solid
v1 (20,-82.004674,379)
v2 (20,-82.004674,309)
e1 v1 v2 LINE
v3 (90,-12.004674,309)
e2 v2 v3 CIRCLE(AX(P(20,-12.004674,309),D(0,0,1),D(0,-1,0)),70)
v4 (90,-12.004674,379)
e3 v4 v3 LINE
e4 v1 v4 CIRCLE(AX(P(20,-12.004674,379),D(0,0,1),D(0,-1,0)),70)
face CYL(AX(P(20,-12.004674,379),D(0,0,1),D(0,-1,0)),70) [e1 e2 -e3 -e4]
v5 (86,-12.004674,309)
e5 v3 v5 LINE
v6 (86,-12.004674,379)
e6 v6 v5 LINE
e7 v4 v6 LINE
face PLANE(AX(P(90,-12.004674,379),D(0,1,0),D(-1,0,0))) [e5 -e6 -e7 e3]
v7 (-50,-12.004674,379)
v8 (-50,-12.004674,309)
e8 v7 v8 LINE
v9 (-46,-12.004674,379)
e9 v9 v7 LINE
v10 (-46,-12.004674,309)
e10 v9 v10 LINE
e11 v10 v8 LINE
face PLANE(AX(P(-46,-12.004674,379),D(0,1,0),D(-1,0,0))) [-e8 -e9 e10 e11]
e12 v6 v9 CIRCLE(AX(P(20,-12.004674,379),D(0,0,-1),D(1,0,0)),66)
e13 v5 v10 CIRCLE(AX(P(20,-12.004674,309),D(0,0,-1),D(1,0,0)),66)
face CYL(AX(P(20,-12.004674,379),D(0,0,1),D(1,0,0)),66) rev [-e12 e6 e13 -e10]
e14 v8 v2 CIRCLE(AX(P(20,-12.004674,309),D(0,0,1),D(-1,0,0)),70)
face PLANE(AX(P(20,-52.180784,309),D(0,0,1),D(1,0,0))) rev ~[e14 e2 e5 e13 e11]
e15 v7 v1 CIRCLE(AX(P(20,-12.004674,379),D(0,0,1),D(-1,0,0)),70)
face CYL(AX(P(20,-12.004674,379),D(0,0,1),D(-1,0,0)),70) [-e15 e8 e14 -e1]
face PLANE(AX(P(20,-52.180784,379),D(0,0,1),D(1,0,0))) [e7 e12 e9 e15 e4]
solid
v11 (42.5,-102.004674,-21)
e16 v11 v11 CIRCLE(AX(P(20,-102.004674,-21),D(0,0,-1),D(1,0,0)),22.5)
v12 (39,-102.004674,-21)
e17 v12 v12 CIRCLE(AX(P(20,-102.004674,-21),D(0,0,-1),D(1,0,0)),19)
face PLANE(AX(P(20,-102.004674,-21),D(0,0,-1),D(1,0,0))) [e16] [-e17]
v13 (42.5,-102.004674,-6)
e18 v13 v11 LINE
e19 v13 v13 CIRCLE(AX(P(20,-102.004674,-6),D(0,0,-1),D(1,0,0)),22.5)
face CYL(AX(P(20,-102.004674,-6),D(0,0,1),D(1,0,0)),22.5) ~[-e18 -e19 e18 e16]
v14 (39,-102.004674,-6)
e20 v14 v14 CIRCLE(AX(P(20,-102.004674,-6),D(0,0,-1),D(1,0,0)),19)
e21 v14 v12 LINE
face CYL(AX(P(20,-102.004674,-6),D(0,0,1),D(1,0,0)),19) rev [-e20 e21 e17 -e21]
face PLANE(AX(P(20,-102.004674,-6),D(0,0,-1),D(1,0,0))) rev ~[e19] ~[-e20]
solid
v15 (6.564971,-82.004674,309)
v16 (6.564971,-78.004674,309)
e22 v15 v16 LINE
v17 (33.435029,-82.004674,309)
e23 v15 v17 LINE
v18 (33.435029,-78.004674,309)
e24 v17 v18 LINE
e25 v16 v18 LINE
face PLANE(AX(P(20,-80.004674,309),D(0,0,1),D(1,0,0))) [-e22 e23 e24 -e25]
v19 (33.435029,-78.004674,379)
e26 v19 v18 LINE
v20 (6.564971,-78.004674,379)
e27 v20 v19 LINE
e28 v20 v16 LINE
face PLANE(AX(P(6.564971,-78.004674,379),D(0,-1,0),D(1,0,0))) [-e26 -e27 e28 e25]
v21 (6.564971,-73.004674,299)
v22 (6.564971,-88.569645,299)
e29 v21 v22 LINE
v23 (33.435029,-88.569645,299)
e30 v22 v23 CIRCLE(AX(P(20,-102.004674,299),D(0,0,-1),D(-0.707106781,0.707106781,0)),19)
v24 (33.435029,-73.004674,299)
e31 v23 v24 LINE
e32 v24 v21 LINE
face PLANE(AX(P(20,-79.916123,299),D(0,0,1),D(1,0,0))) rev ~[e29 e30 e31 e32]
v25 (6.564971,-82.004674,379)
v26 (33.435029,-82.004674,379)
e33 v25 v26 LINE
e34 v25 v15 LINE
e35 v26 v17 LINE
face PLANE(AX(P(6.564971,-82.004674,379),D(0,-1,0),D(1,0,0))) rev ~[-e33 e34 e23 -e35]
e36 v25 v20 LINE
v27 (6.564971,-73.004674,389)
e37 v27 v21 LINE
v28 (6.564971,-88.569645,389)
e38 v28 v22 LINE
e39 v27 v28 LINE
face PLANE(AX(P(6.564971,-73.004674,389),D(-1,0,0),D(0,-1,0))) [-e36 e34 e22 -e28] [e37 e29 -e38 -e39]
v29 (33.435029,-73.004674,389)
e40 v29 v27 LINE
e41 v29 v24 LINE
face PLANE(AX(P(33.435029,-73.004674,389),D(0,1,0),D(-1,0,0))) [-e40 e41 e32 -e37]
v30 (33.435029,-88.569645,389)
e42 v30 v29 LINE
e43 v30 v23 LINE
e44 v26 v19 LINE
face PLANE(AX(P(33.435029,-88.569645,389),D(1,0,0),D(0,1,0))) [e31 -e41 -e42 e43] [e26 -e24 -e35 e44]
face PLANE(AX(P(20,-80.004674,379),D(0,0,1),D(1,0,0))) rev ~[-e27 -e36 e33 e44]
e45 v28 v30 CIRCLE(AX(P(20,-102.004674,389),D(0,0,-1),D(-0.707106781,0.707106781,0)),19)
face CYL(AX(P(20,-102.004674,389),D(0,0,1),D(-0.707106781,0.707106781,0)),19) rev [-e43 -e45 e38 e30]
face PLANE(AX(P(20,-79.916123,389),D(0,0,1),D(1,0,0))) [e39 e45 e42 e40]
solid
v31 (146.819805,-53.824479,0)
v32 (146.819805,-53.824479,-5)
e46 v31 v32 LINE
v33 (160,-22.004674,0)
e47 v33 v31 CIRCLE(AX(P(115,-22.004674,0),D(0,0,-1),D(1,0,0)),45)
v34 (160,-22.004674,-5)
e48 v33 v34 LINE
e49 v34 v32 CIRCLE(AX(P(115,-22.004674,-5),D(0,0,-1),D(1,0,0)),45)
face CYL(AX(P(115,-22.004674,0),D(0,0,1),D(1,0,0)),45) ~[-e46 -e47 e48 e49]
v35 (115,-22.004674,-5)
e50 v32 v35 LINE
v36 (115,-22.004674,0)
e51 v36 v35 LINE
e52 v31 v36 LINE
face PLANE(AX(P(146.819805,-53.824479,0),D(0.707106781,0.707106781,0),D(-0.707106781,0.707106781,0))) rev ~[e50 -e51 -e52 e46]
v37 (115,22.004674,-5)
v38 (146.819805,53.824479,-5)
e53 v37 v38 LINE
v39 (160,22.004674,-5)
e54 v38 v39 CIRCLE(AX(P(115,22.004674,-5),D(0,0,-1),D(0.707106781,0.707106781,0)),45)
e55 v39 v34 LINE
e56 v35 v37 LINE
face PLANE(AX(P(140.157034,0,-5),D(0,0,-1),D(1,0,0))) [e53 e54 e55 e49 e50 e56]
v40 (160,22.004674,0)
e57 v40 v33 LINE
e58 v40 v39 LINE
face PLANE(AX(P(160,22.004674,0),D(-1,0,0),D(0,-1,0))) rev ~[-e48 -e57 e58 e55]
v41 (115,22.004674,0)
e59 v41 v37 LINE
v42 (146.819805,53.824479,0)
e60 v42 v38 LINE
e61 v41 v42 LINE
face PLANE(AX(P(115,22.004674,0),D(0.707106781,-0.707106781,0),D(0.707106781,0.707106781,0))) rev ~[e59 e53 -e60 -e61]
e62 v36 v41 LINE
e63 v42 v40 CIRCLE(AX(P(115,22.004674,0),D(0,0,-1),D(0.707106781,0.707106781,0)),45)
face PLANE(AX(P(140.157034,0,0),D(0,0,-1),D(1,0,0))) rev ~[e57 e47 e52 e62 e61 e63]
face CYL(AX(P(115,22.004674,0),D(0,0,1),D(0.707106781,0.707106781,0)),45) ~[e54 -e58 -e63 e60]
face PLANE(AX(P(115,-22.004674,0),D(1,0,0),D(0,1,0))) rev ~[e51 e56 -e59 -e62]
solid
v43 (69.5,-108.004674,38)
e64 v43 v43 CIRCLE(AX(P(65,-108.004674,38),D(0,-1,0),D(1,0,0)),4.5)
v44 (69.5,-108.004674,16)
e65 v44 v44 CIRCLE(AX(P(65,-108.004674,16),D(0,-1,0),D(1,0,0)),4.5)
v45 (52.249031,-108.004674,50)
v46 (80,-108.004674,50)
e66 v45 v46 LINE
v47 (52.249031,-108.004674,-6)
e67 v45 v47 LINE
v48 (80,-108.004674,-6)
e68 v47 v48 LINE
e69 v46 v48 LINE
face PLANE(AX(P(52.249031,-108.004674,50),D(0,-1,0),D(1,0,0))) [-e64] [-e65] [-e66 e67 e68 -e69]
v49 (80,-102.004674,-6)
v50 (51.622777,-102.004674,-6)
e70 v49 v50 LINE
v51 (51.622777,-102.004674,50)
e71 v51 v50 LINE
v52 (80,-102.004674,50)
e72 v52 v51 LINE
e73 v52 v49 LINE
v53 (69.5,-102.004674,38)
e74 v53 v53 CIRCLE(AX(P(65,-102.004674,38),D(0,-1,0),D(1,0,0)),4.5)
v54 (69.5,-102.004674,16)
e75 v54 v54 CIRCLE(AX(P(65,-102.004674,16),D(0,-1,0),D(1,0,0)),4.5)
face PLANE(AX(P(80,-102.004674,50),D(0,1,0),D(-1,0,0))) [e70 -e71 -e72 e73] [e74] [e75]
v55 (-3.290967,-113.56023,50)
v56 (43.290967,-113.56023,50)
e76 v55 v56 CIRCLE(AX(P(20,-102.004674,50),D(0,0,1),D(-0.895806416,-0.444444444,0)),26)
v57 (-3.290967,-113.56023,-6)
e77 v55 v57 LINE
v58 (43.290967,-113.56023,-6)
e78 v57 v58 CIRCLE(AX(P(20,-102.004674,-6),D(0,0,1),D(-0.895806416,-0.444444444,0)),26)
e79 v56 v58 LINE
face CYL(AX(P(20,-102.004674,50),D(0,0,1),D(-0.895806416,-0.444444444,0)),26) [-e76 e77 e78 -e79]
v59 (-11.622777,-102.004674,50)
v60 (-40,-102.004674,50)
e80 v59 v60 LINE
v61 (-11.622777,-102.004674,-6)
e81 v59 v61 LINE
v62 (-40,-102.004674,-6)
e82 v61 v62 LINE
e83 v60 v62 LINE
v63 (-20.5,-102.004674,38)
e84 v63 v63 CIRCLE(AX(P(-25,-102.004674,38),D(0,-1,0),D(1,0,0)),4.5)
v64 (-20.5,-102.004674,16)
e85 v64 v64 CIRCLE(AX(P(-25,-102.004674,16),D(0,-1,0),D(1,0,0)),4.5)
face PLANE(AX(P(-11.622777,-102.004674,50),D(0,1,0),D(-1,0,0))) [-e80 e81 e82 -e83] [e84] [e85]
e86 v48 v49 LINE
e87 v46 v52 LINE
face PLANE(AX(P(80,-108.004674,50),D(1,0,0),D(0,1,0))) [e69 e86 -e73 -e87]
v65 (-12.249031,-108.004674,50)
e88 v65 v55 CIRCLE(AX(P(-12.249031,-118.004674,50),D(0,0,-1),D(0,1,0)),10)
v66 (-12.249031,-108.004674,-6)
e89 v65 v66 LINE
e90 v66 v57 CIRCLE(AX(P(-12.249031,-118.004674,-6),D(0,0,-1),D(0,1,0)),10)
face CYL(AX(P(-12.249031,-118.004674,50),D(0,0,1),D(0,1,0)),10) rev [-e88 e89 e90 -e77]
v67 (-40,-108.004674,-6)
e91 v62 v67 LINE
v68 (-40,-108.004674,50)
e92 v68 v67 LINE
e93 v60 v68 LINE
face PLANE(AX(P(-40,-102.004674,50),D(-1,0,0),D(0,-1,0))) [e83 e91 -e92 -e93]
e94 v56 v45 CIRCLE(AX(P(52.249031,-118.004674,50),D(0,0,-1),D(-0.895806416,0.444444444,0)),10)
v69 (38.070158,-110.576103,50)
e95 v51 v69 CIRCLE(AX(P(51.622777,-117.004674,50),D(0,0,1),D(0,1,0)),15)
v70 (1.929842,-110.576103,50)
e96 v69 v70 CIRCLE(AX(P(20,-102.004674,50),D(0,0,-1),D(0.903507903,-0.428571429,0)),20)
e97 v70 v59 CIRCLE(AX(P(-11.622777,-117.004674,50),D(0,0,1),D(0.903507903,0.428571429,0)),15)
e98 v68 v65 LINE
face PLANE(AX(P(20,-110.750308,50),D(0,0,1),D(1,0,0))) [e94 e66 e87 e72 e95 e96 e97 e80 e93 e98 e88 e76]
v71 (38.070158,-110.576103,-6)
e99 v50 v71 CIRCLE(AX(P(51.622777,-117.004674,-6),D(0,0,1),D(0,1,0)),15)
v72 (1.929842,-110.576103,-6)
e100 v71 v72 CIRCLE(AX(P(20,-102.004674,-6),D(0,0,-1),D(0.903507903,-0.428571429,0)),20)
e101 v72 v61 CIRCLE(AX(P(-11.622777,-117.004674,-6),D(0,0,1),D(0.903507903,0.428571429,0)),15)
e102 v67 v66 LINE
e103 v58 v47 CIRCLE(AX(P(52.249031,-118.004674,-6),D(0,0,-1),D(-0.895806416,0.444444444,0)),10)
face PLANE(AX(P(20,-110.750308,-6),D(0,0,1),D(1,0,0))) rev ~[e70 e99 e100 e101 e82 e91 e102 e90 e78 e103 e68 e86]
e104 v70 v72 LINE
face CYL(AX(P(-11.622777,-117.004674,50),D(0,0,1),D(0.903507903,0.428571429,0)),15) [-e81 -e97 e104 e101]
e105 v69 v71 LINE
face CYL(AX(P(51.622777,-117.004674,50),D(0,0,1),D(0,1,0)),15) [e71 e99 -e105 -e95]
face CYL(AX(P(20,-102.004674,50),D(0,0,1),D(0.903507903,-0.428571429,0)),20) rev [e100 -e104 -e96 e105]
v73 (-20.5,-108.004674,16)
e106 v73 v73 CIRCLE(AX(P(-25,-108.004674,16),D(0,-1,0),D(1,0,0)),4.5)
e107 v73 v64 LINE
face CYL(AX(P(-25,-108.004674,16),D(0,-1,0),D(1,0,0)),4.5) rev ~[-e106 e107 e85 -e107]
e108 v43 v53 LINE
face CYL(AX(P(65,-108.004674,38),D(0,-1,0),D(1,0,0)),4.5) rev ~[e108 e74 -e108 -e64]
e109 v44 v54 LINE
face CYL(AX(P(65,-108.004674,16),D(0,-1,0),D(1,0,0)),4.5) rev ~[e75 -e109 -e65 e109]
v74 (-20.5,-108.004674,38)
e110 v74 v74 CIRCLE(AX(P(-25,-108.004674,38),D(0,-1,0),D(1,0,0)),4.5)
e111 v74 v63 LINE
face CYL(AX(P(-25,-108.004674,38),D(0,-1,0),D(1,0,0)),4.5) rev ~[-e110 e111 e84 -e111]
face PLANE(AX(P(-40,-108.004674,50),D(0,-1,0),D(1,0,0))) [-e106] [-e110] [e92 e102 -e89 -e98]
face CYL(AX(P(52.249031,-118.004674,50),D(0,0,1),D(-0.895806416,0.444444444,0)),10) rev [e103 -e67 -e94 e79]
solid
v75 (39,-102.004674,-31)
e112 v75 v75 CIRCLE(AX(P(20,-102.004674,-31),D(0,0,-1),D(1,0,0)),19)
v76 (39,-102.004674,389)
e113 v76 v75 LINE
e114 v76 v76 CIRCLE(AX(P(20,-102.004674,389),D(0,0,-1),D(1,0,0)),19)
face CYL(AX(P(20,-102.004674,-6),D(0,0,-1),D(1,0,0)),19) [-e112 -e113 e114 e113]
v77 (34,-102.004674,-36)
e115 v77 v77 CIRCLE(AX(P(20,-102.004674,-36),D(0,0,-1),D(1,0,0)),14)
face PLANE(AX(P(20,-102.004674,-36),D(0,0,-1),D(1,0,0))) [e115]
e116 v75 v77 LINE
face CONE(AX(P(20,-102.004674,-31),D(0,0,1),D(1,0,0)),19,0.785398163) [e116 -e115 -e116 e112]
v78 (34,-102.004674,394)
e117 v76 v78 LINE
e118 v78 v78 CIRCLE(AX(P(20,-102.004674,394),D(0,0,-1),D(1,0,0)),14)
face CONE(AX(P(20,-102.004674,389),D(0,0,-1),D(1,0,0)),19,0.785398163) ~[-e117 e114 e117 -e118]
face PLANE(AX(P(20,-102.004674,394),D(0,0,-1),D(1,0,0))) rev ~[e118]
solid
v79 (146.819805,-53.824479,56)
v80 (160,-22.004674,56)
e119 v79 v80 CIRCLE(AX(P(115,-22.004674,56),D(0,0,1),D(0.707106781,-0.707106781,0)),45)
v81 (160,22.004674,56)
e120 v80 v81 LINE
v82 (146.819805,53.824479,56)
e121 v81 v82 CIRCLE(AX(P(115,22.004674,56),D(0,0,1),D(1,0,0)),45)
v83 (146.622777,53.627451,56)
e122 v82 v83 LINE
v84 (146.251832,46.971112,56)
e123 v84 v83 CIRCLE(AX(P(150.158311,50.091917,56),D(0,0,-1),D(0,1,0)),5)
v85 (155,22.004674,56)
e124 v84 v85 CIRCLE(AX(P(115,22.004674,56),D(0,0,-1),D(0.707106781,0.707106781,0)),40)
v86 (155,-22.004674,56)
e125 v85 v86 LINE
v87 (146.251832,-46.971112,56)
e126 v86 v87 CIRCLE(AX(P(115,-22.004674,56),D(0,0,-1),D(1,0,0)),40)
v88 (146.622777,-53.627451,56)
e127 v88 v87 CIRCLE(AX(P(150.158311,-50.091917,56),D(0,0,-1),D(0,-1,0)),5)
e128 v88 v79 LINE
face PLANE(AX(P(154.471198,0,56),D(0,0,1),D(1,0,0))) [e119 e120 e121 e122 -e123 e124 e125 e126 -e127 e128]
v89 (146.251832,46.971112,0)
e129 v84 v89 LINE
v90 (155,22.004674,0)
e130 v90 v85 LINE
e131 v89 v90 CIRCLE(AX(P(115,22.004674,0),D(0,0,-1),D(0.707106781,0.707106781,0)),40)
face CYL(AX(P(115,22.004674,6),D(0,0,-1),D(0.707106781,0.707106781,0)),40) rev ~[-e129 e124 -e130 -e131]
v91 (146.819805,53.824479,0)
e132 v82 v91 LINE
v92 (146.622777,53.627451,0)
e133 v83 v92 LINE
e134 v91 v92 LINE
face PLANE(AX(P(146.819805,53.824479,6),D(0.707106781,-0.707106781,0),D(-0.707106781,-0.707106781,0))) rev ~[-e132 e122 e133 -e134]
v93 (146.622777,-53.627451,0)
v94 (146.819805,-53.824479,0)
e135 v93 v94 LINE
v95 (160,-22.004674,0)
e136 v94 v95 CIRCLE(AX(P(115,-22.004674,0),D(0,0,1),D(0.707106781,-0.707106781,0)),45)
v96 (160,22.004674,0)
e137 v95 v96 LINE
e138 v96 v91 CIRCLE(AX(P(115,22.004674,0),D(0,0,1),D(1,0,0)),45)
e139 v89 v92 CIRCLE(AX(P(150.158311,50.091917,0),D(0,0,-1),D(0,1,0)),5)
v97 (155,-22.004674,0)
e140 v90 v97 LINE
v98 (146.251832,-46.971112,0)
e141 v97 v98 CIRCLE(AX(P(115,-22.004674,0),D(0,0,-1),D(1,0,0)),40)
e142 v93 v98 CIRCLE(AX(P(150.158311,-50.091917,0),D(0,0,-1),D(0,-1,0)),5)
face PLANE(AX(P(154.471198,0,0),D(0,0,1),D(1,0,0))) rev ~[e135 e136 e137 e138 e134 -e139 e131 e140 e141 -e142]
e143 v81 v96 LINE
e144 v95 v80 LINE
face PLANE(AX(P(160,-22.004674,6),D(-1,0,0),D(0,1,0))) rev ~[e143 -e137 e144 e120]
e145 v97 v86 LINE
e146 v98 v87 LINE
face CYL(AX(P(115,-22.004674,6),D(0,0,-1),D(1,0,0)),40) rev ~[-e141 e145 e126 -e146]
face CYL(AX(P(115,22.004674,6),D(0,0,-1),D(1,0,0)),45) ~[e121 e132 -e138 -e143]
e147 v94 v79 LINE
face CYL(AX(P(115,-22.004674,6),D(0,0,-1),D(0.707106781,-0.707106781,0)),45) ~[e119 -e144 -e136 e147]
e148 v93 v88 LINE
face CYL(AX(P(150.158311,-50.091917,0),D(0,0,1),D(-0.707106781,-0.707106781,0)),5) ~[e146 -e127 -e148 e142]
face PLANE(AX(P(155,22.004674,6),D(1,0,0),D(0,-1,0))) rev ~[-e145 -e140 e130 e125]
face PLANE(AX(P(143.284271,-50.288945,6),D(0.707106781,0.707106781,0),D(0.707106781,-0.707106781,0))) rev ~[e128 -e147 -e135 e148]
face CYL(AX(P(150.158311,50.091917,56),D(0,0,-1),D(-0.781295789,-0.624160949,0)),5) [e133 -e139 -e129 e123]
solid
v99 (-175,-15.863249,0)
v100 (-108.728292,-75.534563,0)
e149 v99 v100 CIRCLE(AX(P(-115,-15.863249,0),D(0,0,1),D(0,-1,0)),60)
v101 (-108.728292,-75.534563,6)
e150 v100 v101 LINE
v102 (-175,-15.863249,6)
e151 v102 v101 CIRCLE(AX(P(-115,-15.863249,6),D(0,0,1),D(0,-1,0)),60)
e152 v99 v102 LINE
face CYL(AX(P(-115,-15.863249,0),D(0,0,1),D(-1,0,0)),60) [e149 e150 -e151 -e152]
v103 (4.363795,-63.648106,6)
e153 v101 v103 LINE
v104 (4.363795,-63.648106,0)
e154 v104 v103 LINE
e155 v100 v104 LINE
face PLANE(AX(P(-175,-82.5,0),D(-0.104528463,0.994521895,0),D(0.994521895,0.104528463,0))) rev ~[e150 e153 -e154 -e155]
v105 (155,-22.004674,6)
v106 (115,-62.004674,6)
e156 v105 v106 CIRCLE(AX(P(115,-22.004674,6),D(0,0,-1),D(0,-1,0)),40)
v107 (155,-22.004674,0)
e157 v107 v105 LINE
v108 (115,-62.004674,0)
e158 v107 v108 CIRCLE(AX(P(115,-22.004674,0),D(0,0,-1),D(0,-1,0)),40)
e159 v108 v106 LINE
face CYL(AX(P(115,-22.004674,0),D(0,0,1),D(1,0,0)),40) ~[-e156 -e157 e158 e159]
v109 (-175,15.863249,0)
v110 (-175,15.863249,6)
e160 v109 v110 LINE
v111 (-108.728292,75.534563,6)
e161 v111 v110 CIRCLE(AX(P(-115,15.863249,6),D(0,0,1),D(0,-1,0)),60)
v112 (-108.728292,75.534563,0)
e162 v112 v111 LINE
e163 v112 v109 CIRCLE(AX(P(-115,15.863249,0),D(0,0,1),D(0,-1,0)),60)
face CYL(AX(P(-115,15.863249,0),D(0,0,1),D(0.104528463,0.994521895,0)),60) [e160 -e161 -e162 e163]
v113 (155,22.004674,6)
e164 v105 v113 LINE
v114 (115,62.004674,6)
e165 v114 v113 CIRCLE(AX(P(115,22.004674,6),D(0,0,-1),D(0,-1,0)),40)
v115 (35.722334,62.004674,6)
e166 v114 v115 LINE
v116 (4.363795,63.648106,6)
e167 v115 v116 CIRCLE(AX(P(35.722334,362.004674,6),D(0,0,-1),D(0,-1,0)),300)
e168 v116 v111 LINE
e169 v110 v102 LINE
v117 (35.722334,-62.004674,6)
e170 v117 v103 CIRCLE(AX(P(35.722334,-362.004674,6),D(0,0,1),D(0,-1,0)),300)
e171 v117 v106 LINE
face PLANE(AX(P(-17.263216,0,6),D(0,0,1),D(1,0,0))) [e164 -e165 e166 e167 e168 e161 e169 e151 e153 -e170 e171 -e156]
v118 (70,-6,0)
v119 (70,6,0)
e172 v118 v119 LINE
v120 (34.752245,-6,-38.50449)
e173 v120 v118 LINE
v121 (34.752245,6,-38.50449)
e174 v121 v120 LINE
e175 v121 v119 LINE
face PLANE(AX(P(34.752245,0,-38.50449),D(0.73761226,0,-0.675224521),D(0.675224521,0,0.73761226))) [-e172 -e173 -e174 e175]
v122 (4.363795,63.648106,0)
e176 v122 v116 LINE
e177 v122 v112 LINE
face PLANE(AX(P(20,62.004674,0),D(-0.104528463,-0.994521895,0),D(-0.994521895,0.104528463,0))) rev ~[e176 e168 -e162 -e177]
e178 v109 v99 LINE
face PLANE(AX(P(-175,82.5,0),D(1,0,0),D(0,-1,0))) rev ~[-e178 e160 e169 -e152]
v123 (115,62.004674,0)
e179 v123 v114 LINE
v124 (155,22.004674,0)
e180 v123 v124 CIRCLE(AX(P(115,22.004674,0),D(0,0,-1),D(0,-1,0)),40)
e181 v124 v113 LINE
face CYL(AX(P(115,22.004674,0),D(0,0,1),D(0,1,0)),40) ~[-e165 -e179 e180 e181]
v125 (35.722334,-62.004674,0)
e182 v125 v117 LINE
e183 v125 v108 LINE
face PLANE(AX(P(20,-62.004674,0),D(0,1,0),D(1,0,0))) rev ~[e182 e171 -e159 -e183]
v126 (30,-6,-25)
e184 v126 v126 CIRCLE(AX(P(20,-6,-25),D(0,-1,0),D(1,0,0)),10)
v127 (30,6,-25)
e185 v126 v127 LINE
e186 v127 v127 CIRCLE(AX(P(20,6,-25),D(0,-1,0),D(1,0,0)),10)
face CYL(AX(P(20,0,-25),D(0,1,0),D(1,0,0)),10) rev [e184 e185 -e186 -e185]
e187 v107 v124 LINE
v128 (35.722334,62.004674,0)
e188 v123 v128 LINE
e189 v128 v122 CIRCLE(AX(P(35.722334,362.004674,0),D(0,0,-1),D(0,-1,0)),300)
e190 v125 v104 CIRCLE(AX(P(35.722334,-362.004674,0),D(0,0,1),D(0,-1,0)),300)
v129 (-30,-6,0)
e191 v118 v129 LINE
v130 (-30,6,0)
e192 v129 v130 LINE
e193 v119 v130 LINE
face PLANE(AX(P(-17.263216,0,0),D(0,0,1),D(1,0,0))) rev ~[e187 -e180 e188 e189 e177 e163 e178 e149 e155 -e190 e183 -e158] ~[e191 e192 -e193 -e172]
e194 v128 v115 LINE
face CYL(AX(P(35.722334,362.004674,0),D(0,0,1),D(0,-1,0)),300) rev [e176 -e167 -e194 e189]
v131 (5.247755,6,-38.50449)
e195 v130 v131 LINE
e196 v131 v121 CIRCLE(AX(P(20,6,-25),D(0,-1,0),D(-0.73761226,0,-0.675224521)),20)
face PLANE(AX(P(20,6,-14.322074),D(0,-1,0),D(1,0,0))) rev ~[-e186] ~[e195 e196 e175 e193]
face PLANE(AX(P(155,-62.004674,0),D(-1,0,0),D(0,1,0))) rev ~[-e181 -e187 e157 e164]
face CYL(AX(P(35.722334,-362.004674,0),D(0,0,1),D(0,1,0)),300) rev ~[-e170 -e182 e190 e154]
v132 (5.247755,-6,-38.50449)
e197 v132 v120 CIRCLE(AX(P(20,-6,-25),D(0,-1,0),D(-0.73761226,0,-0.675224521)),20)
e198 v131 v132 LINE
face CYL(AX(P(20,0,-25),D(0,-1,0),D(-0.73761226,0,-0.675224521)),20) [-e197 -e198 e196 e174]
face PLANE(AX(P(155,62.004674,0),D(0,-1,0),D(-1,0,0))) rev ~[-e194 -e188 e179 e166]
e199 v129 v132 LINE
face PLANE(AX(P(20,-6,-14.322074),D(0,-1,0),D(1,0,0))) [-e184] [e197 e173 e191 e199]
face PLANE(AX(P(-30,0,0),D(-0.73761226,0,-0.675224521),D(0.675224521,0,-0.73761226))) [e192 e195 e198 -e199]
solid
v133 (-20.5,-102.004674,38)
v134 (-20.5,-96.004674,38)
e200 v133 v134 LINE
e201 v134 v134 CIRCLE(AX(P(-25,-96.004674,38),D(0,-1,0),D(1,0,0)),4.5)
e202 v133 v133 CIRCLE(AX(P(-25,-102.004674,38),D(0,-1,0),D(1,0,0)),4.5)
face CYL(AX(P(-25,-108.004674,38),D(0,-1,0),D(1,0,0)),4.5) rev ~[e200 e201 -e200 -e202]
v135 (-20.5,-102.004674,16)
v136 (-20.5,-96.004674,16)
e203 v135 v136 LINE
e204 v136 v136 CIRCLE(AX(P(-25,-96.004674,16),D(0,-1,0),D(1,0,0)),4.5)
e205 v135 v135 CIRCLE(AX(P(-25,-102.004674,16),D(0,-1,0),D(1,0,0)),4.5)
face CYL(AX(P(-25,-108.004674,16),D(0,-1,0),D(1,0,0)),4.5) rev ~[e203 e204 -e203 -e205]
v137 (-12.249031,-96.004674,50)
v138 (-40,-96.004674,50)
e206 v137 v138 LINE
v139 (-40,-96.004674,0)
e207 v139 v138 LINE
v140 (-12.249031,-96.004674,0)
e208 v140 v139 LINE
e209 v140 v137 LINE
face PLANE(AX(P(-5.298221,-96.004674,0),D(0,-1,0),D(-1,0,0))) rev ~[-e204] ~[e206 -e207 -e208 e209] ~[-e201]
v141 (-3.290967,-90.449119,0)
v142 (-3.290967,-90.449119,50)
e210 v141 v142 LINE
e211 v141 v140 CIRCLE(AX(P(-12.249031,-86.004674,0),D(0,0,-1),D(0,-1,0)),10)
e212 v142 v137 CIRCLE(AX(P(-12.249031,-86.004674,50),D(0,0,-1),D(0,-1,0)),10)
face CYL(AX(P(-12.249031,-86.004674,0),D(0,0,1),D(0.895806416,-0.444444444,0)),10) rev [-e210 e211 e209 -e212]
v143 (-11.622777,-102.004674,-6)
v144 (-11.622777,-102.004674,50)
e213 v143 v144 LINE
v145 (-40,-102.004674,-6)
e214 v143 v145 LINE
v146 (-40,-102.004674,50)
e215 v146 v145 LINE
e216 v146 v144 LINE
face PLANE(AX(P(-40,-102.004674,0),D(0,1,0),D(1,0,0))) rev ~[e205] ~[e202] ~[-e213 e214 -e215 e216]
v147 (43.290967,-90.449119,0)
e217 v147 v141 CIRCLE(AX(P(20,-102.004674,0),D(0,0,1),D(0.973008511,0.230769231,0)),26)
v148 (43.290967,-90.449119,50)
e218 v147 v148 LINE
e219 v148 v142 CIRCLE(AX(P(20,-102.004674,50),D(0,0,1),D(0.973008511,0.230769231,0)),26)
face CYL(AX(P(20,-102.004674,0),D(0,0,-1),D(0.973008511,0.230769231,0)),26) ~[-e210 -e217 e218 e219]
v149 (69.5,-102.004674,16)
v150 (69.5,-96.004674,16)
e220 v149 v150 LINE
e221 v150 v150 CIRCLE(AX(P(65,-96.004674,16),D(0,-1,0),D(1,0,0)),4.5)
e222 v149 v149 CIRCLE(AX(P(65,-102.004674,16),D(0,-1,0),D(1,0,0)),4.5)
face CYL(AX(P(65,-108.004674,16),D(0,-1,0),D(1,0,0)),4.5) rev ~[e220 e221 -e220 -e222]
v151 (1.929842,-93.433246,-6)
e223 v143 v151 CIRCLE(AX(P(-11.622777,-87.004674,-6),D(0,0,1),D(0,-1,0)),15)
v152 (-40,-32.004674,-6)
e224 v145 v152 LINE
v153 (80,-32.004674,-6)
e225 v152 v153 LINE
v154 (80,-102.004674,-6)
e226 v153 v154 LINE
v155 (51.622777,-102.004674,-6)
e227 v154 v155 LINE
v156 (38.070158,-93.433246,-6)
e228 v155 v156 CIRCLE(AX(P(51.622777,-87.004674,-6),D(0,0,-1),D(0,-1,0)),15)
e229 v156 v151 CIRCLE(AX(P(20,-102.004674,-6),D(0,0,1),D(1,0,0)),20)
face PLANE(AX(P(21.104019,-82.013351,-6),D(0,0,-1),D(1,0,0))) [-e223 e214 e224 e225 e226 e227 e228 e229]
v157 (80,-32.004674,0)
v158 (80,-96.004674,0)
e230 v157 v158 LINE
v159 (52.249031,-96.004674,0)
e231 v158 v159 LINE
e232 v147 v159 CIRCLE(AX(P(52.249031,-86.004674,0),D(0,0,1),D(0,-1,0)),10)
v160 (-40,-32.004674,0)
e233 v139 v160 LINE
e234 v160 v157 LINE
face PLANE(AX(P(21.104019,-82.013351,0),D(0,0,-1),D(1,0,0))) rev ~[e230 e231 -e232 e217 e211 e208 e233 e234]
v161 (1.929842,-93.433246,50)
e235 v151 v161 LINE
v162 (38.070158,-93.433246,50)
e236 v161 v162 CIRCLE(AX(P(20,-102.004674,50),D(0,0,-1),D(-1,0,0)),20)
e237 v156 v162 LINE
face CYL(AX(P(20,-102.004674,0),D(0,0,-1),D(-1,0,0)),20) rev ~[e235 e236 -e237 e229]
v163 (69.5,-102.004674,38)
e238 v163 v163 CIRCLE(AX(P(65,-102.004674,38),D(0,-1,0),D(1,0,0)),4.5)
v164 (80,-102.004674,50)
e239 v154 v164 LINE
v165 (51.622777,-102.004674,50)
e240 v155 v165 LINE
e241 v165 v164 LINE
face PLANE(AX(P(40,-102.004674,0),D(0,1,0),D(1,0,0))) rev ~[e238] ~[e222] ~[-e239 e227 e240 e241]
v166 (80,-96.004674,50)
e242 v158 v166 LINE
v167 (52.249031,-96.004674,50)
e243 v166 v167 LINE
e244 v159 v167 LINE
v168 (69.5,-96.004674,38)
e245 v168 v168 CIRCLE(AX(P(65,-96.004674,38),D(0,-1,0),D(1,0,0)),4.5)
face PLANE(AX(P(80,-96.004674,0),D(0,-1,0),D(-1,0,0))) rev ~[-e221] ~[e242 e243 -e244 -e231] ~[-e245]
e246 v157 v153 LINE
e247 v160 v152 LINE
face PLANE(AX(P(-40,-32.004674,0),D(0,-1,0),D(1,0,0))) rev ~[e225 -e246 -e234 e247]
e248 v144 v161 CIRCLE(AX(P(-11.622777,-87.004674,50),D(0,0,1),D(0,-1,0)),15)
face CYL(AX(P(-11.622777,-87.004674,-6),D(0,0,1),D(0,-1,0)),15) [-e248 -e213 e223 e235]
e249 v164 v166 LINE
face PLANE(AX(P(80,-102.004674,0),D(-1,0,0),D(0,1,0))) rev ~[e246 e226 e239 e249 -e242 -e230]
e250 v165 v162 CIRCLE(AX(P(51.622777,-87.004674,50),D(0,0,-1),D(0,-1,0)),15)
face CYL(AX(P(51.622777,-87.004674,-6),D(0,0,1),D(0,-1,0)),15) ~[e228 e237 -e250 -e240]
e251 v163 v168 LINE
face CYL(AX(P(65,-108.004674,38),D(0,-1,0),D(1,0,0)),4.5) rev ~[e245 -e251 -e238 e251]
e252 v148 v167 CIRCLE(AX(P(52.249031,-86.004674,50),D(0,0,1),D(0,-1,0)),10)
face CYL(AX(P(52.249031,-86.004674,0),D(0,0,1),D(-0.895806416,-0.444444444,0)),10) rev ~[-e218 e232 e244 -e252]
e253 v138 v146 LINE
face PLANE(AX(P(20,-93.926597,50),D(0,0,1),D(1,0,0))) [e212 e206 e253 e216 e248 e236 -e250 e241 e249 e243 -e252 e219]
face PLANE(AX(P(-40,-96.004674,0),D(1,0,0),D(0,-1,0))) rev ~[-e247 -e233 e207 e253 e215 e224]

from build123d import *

# Parameters (mm, degrees)
F1_DEPTH  = 6
F2_R      = 60
F3_R      = 40
F4_R      = 300
F5_R      = 10
F6_DEPTH  = 6
F8_DEPTH  = 6
F9_DEPTH  = 50
F10_R     = 5
F12_DEPTH = 5
F14_DEPTH = 6
F16_DEPTH = 50
F17_R     = 10
F18_R     = 15
F20_DEPTH = 56
F21_R     = 4.5
F22_DEPTH = 25
F23_R     = 4.5
F24_DEPTH = 25
F25_R     = 19
F26_DEPTH = 400
F27_DEPTH = 30
F28_SIZE  = 5
F29_R     = 22.5
F29_R_2   = 19
F30_DEPTH = 15
F31_SIZE  = 5
F34_DEPTH = 90
F36_W     = 26.8700576851
F36_H     = 4
F37_DEPTH = 70
F39_DEPTH = 70


with BuildPart() as f1:
    # F0 (on Top) → F1 (new body)
    with BuildSketch(Plane.XY):
        Polygon((20, 62.0046741232), (-175, 82.5), (-175, -82.5), (20, -62.0046741232), (155, -62.0046741232), (155, 62.0046741232), align=None)
    extrude(amount=F1_DEPTH)

    # F2
    f2_edges = [f1.edges().sort_by_distance(p)[0] for p in [
        (-175, -82.5, 3),
        (-175, 82.5, 3),
    ]]
    fillet(f2_edges, radius=F2_R)

    # F3
    f3_edges = [f1.edges().sort_by_distance(p)[0] for p in [
        (155, 62.004674, 3),
        (155, -62.004674, 3),
    ]]
    fillet(f3_edges, radius=F3_R)

    # F4
    f4_edges = [f1.edges().sort_by_distance(p)[0] for p in [
        (20, -62.004674, 3),
        (20, 62.004674, 3),
    ]]
    fillet(f4_edges, radius=F4_R)

    # F5 (on Front) → F6 (join, symmetric)
    with BuildSketch(Plane.XZ):
        with BuildLine():
            Line((-30, 0), (5.2477547929, -38.5044904143))
            ThreePointArc((5.2477547929, -38.5044904143), (20, -45), (34.7522452071, -38.5044904143))
            Line((34.7522452071, -38.5044904143), (70, 0))
            Line((70, 0), (-30, 0))
        make_face()
        with Locations((20, -25)):
            Circle(F5_R, mode=Mode.SUBTRACT)
    extrude(amount=F6_DEPTH, both=True)

    # F23 (on face) → F24 (cut)
    with BuildSketch(Plane(origin=(0, -96.0046741232, 0), x_dir=(-1, 0, 0), z_dir=(0, 1, 0))):
        with Locations((25, 38)):
            Circle(F23_R)
        with Locations((25, 16)):
            Circle(F23_R)
        with Locations((-65, 38)):
            Circle(F23_R)
        with Locations((-65, 16)):
            Circle(F23_R)
    extrude(amount=-F24_DEPTH, mode=Mode.SUBTRACT)


with BuildPart() as f8:
    # F7 (on face) → F8 (new body)
    with BuildSketch(Plane.XY.offset(6)):
        with BuildLine():
            ThreePointArc((143.2842712475, 50.2889453707), (151.9551813005, 37.3120114178), (155, 22.0046741232))
            Line((155, 22.0046741232), (155, -22.0046741232))
            ThreePointArc((155, -22.0046741232), (151.9551813005, -37.3120114178), (143.2842712475, -50.2889453707))
            Line((143.2842712475, -50.2889453707), (146.8198051534, -53.8244792766))
            ThreePointArc((146.8198051534, -53.8244792766), (156.574578963, -39.2254285796), (160, -22.0046741232))
            Line((160, -22.0046741232), (160, 22.0046741232))
            ThreePointArc((160, 22.0046741232), (156.574578963, 39.2254285796), (146.8198051534, 53.8244792766))
            Line((146.8198051534, 53.8244792766), (143.2842712475, 50.2889453707))
        make_face()
    extrude(amount=-F8_DEPTH)

    # F7 (on face) → F9 (join)
    with BuildSketch(Plane.XY.offset(6)):
        with BuildLine():
            ThreePointArc((143.2842712475, 50.2889453707), (151.9551813005, 37.3120114178), (155, 22.0046741232))
            Line((155, 22.0046741232), (155, -22.0046741232))
            ThreePointArc((155, -22.0046741232), (151.9551813005, -37.3120114178), (143.2842712475, -50.2889453707))
            Line((143.2842712475, -50.2889453707), (146.8198051534, -53.8244792766))
            ThreePointArc((146.8198051534, -53.8244792766), (156.574578963, -39.2254285796), (160, -22.0046741232))
            Line((160, -22.0046741232), (160, 22.0046741232))
            ThreePointArc((160, 22.0046741232), (156.574578963, 39.2254285796), (146.8198051534, 53.8244792766))
            Line((146.8198051534, 53.8244792766), (143.2842712475, 50.2889453707))
        make_face()
    extrude(amount=F9_DEPTH)

    # F10
    f10_edges = [f8.edges().sort_by_distance(p)[0] for p in [
        (143.284271, -50.288945, 28),
        (143.284271, 50.288945, 28),
    ]]
    fillet(f10_edges, radius=F10_R)


with BuildPart() as f12:
    # F11 (on face) → F12 (new body)
    with BuildSketch(Plane(origin=(0, 0, 0), x_dir=(1, 0, 0), z_dir=(0, 0, -1))):
        with BuildLine():
            ThreePointArc((160, 22.0046741232), (156.574578963, 39.2254285796), (146.8198051534, 53.8244792766))
            Line((146.8198051534, 53.8244792766), (115, 22.0046741232))
            Line((115, 22.0046741232), (115, -22.0046741232))
            Line((115, -22.0046741232), (146.8198051534, -53.8244792766))
            ThreePointArc((146.8198051534, -53.8244792766), (156.574578963, -39.2254285796), (160, -22.0046741232))
            Line((160, -22.0046741232), (160, 22.0046741232))
        make_face()
    extrude(amount=F12_DEPTH)


with BuildPart() as f14:
    # F13 (on face) → F14 (new body)
    with BuildSketch(Plane(origin=(0, 0, 0), x_dir=(1, 0, 0), z_dir=(0, 0, -1))):
        with BuildLine():
            Line((0, 102.0046741232), (-40, 102.0046741232))
            Line((-40, 102.0046741232), (-40, 68.3109282391))
            Line((-40, 68.3109282391), (4.3637948046, 63.6481055127))
            ThreePointArc((4.3637948046, 63.6481055127), (20.021546912, 62.4158136968), (35.7223337849, 62.0046741232))
            Line((35.7223337849, 62.0046741232), (80, 62.0046741232))
            Line((80, 62.0046741232), (80, 102.0046741232))
            Line((80, 102.0046741232), (40, 102.0046741232))
            ThreePointArc((40, 102.0046741232), (20, 82.0046741232), (0, 102.0046741232))
        make_face()
        with BuildLine():
            Line((4.3637948046, 63.6481055127), (-40, 68.3109282391))
            Line((-40, 68.3109282391), (-40, 32.0046741232))
            Line((-40, 32.0046741232), (80, 32.0046741232))
            Line((80, 32.0046741232), (80, 62.0046741232))
            Line((80, 62.0046741232), (35.7223337849, 62.0046741232))
            ThreePointArc((35.7223337849, 62.0046741232), (20.021546912, 62.4158136968), (4.3637948046, 63.6481055127))
        make_face()
    extrude(amount=F14_DEPTH)

    # F15 (on face) → F16 (join)
    with BuildSketch(Plane.XY):
        with BuildLine():
            Line((-40, -102.0046741232), (0, -102.0046741232))
            ThreePointArc((0, -102.0046741232), (20, -82.0046741232), (40, -102.0046741232))
            Line((40, -102.0046741232), (80, -102.0046741232))
            Line((80, -102.0046741232), (80, -96.0046741232))
            Line((80, -96.0046741232), (45.2982212813, -96.0046741232))
            ThreePointArc((45.2982212813, -96.0046741232), (20, -76.0046741232), (-5.2982212813, -96.0046741232))
            Line((-5.2982212813, -96.0046741232), (-40, -96.0046741232))
            Line((-40, -96.0046741232), (-40, -102.0046741232))
        make_face()
    extrude(amount=F16_DEPTH)

    # F17
    f17_edges = [f14.edges().sort_by_distance(p)[0] for p in [
        (-5.298221, -96.004674, 25),
        (45.298221, -96.004674, 25),
    ]]
    fillet(f17_edges, radius=F17_R)

    # F18
    f18_edges = [f14.edges().sort_by_distance(p)[0] for p in [
        (40, -102.004674, 22),
        (0, -102.004674, 22),
    ]]
    fillet(f18_edges, radius=F18_R)


with BuildPart() as f20:
    # F19 (on face) → F20 (new body)
    with BuildSketch(Plane.XY.offset(50)):
        with BuildLine():
            Line((-11.6227766017, -102.0046741232), (-40, -102.0046741232))
            Line((-40, -102.0046741232), (-40, -108.0046741232))
            Line((-40, -108.0046741232), (-12.2490309932, -108.0046741232))
            ThreePointArc((-12.2490309932, -108.0046741232), (-6.9785682262, -109.5063082672), (-3.2909668284, -113.5602296787))
            ThreePointArc((-3.2909668284, -113.5602296787), (20, -128.0046741232), (43.2909668284, -113.5602296787))
            ThreePointArc((43.2909668284, -113.5602296787), (46.9785682262, -109.5063082672), (52.2490309932, -108.0046741232))
            Line((52.2490309932, -108.0046741232), (80, -108.0046741232))
            Line((80, -108.0046741232), (80, -102.0046741232))
            Line((80, -102.0046741232), (51.6227766017, -102.0046741232))
            ThreePointArc((51.6227766017, -102.0046741232), (43.6049393443, -104.3273603023), (38.0701580581, -110.5761026946))
            ThreePointArc((38.0701580581, -110.5761026946), (20, -122.0046741232), (1.9298419419, -110.5761026946))
            ThreePointArc((1.9298419419, -110.5761026946), (-3.6049393443, -104.3273603023), (-11.6227766017, -102.0046741232))
        make_face()
    extrude(amount=-F20_DEPTH)


with BuildPart() as f22_tool:
    # F21 (on face) → F22 (new body)
    with BuildSketch(Plane.XZ.offset(108.0046741232)):
        with Locations((-25, 38)):
            Circle(F21_R)
        with Locations((-25, 16)):
            Circle(F21_R)
        with Locations((65, 38)):
            Circle(F21_R)
        with Locations((65, 16)):
            Circle(F21_R)
    extrude(amount=-F22_DEPTH)


with BuildPart() as f14_1:
    add(f14.part)

    # F22: cut by f22_tool
    add(f22_tool.part, mode=Mode.SUBTRACT)


with BuildPart() as f20_1:
    add(f20.part)

    # F22: cut by f22_tool
    add(f22_tool.part, mode=Mode.SUBTRACT)


with BuildPart() as f26:
    # F25 (on face) → F26 (new body)
    with BuildSketch(Plane(origin=(0, 0, -6), x_dir=(1, 0, 0), z_dir=(0, 0, -1))):
        with Locations((20, 102.0046741232)):
            Circle(F25_R)
    extrude(amount=-F26_DEPTH)

    # F27 (add): a face of the model
    f27_faces = [f26.faces().sort_by_distance(p)[0] for p in [
        (20, -102.0046741232, -6),
    ]]
    extrude(f27_faces, amount=F27_DEPTH)

    # F28
    f28_edges = [f26.edges().sort_by_distance(p)[0] for p in [
        (1, -102.004674, -36),
    ]]
    chamfer(f28_edges, length=F28_SIZE)

    # F31
    f31_edges = [f26.edges().sort_by_distance(p)[0] for p in [
        (1, -102.004674, 394),
    ]]
    chamfer(f31_edges, length=F31_SIZE)


with BuildPart() as f30:
    # F29 (on face) → F30 (new body)
    with BuildSketch(Plane(origin=(0, 0, -6), x_dir=(1, 0, 0), z_dir=(0, 0, -1))):
        with Locations((20, 102.0046741232)):
            Circle(F29_R)
        with Locations((20, 102.0046741232)):
            Circle(F29_R_2, mode=Mode.SUBTRACT)
    extrude(amount=F30_DEPTH)


with BuildPart() as f34:
    # F33 (on offset) → F34 (new body)
    with BuildSketch(Plane.XY.offset(389)):
        with BuildLine():
            Line((33.4350288425, -88.5696452806), (33.4350288425, -73.0046741232))
            Line((33.4350288425, -73.0046741232), (6.5649711575, -73.0046741232))
            Line((6.5649711575, -73.0046741232), (6.5649711575, -88.5696452806))
            ThreePointArc((6.5649711575, -88.5696452806), (20, -83.0046741232), (33.4350288425, -88.5696452806))
        make_face()
    extrude(amount=-F34_DEPTH)

    # F36 (on offset) → F37 (cut)
    with BuildSketch(Plane.XY.offset(379)):
        with Locations((20, -80.0046741232)):
            Rectangle(F36_W, F36_H)
    extrude(amount=-F37_DEPTH, mode=Mode.SUBTRACT)


with BuildPart() as f39:
    # F38 (on offset) → F39 (new body)
    with BuildSketch(Plane.XY.offset(379)):
        with BuildLine():
            Line((-46, -12.0046741232), (-50, -12.0046741232))
            ThreePointArc((-50, -12.0046741232), (-29.4974746831, -61.5021488063), (20, -82.0046741232))
            ThreePointArc((20, -82.0046741232), (69.4974746831, -61.5021488063), (90, -12.0046741232))
            Line((90, -12.0046741232), (86, -12.0046741232))
            ThreePointArc((86, -12.0046741232), (20, -78.0046741232), (-46, -12.0046741232))
        make_face()
    extrude(amount=-F39_DEPTH)


solid = Compound([f1.part, f8.part, f12.part, f14_1.part, f20_1.part, f26.part, f30.part, f34.part, f39.part])
